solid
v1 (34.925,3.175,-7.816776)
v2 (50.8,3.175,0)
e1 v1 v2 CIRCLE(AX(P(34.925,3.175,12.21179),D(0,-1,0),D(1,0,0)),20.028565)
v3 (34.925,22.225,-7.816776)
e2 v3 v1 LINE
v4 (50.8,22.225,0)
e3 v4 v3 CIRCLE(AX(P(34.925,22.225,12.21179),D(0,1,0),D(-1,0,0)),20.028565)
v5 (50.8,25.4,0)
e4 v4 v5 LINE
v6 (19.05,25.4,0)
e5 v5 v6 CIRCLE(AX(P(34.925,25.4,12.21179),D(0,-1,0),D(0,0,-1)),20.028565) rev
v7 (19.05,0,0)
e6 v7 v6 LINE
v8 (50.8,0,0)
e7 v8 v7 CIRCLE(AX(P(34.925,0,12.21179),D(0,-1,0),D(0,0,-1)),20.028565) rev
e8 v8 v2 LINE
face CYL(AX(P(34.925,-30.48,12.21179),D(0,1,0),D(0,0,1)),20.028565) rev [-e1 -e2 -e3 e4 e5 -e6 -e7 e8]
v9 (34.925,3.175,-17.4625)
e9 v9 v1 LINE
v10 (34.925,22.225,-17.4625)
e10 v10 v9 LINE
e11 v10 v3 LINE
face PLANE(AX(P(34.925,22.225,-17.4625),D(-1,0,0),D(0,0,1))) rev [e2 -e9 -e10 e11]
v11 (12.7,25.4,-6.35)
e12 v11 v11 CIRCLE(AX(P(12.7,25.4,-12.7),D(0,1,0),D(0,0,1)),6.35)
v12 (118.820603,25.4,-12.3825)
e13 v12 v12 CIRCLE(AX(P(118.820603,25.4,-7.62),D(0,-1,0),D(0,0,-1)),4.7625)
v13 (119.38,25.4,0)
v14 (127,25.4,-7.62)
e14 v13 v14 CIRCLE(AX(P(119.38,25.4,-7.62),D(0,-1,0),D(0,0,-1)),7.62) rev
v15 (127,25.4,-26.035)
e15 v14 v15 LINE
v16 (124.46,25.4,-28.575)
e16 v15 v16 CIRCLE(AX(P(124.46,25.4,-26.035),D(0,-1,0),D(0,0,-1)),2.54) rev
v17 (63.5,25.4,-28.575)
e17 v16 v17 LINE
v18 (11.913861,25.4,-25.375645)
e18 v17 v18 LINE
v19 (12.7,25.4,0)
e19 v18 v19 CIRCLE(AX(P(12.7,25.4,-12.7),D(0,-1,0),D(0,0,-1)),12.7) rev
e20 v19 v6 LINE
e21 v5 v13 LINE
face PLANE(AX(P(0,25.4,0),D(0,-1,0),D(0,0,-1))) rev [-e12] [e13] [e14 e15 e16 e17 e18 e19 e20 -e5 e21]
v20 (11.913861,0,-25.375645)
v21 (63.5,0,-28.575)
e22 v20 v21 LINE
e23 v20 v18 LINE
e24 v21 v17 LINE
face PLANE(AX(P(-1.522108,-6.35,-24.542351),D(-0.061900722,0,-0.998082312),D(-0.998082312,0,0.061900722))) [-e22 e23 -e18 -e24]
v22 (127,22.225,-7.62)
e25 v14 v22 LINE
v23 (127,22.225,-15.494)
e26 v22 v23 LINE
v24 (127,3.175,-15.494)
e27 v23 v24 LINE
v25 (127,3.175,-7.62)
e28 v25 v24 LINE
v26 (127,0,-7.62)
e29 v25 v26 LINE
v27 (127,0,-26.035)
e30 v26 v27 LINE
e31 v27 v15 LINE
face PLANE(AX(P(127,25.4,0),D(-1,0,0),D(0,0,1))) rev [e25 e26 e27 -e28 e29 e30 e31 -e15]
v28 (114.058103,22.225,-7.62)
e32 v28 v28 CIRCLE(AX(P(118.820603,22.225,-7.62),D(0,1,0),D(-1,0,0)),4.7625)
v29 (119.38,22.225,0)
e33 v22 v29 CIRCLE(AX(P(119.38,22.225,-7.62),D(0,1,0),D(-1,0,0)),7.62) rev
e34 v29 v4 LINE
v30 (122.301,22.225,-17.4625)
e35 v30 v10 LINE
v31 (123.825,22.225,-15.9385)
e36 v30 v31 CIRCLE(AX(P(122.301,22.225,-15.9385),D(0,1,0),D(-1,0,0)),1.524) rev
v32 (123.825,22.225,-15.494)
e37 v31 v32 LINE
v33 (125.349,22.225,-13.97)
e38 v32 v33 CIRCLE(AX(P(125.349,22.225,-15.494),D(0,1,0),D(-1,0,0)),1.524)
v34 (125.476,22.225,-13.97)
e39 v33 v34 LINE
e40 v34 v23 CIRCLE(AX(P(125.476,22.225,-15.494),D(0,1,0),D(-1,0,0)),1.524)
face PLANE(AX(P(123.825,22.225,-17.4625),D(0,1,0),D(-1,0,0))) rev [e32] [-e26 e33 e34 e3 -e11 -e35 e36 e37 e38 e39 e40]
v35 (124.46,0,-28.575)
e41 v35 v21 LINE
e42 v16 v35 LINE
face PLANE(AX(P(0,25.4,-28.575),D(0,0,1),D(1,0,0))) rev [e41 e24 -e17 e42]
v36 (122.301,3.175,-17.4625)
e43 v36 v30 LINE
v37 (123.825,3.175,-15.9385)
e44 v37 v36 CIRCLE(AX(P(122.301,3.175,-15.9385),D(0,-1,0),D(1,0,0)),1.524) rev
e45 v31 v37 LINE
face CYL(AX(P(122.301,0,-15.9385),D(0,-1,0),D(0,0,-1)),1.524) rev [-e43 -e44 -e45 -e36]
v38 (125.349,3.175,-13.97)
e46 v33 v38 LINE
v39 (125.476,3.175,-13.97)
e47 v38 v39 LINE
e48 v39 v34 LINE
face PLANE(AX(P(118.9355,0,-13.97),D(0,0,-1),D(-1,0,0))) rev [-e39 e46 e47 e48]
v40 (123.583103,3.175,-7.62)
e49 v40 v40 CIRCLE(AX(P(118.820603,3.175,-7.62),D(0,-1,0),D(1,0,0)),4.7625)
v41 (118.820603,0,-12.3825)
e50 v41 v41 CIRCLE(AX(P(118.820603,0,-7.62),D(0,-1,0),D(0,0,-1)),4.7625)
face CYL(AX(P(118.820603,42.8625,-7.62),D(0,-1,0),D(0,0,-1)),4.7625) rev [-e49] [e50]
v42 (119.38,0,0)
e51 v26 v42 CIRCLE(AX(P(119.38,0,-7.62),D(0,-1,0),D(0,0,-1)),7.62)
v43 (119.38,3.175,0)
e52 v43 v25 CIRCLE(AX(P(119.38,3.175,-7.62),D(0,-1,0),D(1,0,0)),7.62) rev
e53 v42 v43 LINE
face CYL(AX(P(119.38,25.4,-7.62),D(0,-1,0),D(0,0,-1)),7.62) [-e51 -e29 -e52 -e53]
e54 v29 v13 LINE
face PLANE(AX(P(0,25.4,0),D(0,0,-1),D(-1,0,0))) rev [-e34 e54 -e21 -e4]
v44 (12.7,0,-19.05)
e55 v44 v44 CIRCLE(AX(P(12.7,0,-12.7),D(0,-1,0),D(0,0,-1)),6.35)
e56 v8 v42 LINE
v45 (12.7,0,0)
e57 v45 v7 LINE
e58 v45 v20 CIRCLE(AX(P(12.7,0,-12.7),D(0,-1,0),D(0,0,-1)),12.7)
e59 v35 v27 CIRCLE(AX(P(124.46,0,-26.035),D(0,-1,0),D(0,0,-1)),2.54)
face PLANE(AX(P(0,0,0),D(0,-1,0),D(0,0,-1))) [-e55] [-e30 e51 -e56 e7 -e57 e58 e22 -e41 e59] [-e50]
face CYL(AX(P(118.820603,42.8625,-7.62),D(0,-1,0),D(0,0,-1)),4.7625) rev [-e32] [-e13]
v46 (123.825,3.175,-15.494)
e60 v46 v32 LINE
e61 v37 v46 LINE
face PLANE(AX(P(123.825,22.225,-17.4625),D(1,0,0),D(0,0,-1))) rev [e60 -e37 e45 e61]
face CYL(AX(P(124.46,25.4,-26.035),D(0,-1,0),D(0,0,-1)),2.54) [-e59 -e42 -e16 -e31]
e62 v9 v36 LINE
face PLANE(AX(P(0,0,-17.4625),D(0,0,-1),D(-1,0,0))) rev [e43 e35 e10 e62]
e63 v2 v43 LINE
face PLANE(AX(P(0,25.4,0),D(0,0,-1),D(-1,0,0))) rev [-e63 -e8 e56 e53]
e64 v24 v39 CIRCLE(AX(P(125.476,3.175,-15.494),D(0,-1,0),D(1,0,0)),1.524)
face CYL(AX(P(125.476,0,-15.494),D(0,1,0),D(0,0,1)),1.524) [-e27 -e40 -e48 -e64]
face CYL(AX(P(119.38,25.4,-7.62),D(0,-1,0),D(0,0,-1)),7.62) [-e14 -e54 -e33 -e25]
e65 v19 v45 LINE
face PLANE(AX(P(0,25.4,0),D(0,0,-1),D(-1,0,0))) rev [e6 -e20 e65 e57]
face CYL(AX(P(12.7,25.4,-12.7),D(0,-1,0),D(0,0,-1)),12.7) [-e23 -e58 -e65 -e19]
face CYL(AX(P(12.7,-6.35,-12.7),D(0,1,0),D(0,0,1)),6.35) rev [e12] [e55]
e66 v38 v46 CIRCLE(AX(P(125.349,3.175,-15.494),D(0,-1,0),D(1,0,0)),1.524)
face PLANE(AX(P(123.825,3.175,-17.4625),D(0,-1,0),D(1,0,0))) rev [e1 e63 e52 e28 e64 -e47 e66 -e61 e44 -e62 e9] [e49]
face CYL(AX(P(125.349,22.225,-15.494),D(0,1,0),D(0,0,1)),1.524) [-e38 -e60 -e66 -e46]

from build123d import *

# Parameters (mm, degrees)
SKETCH1_W               = 127
SKETCH1_H               = 28.575
BOSS_EXTRUDE1_DEPTH     = 25.4
CUT_EXTRUDE3_DEPTH      = 45.72
CUT_EXTRUDE3_DEPTH_BACK = 55.88
FILLET1_R               = 12.7
SKETCH6_R               = 6.35
CUT_EXTRUDE5_DEPTH      = 31.75
CUT_EXTRUDE6_DEPTH      = 31.75
SKETCH8_W               = 88.9
SKETCH8_H               = 19.05
CUT_EXTRUDE7_DEPTH      = 17.4625
FILLET2_R               = 7.62
SKETCH10_R              = 4.7625
CUT_EXTRUDE8_DEPTH      = 42.8625
SKETCH11_W              = 6.189214409
SKETCH11_H              = 19.05
SKETCH11_W_2            = 6.35
CUT_EXTRUDE10_DEPTH     = 8.0645
FILLET3_R               = 1.524
FILLET4_R               = 2.54


with BuildPart() as part:
    # Sketch1 → Boss-Extrude1 (new body)
    with BuildSketch(Plane(origin=(0, 0, 0), x_dir=(1, 0, 0), z_dir=(0, 1, 0))):
        with Locations((63.5, 14.2875)):
            Rectangle(SKETCH1_W, SKETCH1_H)
    extrude(amount=BOSS_EXTRUDE1_DEPTH)

    # Sketch5 → Cut-Extrude3 (cut, two sides: drawn at the far end of the back side and taken through both)
    with BuildSketch(Plane(origin=(0, 25.4, 0), x_dir=(1, 0, 0), z_dir=(0, 1, 0)).offset(-CUT_EXTRUDE3_DEPTH_BACK)):
        with BuildLine():
            Line((19.05, 0), (50.8, 0))
            ThreePointArc((50.8, 0), (34.925, 7.816775665), (19.05, 0))
        make_face()
    extrude(amount=CUT_EXTRUDE3_DEPTH + CUT_EXTRUDE3_DEPTH_BACK, mode=Mode.SUBTRACT)

    # Fillet1
    fillet1_edges = [part.edges().sort_by_distance(p)[0] for p in [
        (0, 12.7, -28.575),
        (0, 12.7, 0),
    ]]
    fillet(fillet1_edges, radius=FILLET1_R)

    # Sketch6 → Cut-Extrude5 (cut)
    with BuildSketch(Plane(origin=(0, 25.4, 0), x_dir=(1, 0, 0), z_dir=(0, 1, 0))):
        with Locations(Location((12.7, 12.7, 0), (0, 0, 270))):
            Circle(SKETCH6_R)
    extrude(amount=-CUT_EXTRUDE5_DEPTH, mode=Mode.SUBTRACT)

    # Sketch7 → Cut-Extrude6 (cut)
    with BuildSketch(Plane(origin=(0, 25.4, 0), x_dir=(1, 0, 0), z_dir=(0, 1, 0))):
        with BuildLine():
            Line((11.913860826, 25.375645356), (63.5, 28.575))
            Line((63.5, 28.575), (12.7, 28.575))
            ThreePointArc((12.7, 28.575), (3.719743879, 24.855256121), (0, 15.875))
            Line((0, 15.875), (0, 12.7))
            ThreePointArc((0, 12.7), (3.445974727, 21.397874237), (11.913860826, 25.375645356))
        make_face()
    extrude(amount=-CUT_EXTRUDE6_DEPTH, mode=Mode.SUBTRACT)

    # Sketch8 → Cut-Extrude7 (cut)
    with BuildSketch(Plane.XY):
        with Locations((79.375, 12.7)):
            Rectangle(SKETCH8_W, SKETCH8_H)
    extrude(amount=-CUT_EXTRUDE7_DEPTH, mode=Mode.SUBTRACT)

    # Fillet2
    # the kernel refuses this fillet: 7.62 mm, written as the material it takes off along each edge
    with BuildSketch(Plane(origin=(127, -19.05, 0), x_dir=(-1, 0, 0), z_dir=(0, 1, 0))) as fillet2_piece_1:
        with BuildLine():
            CenterArc((FILLET2_R, -FILLET2_R), FILLET2_R, 90, 90)
            Line((0, -FILLET2_R), (0, 0))
            Line((0, 0), (FILLET2_R, 0))
        make_face()
    extrude(amount=63.5, mode=Mode.SUBTRACT)

    # Sketch10 → Cut-Extrude8 (cut)
    with BuildSketch(Plane.XZ):
        with Locations(Location((118.820602805, -7.62, 0), (0, 0, 270))):
            Circle(SKETCH10_R)
    extrude(amount=-CUT_EXTRUDE8_DEPTH, mode=Mode.SUBTRACT)

    # Sketch11 → Cut-Extrude10 (cut)
    with BuildSketch(Plane(origin=(127, 0, 0), x_dir=(0, 0, -1), z_dir=(1, 0, 0))):
        with Locations((4.525392796, 12.7)):
            Rectangle(SKETCH11_W, SKETCH11_H)
        with Locations((10.795, 12.7)):
            Rectangle(SKETCH11_W_2, SKETCH11_H)
    extrude(amount=-CUT_EXTRUDE10_DEPTH, mode=Mode.SUBTRACT)

    # Fillet3
    fillet3_edges = [part.edges().sort_by_distance(p)[0] for p in [
        (123.825, 12.7, -13.97),
        (127, 12.7, -13.97),
        (123.825, 12.7, -17.4625),
    ]]
    fillet(fillet3_edges, radius=FILLET3_R)

    # Fillet4
    fillet4_edges = [part.edges().sort_by_distance(p)[0] for p in [
        (127, 12.7, -28.575),
    ]]
    fillet(fillet4_edges, radius=FILLET4_R)


solid = part.part
